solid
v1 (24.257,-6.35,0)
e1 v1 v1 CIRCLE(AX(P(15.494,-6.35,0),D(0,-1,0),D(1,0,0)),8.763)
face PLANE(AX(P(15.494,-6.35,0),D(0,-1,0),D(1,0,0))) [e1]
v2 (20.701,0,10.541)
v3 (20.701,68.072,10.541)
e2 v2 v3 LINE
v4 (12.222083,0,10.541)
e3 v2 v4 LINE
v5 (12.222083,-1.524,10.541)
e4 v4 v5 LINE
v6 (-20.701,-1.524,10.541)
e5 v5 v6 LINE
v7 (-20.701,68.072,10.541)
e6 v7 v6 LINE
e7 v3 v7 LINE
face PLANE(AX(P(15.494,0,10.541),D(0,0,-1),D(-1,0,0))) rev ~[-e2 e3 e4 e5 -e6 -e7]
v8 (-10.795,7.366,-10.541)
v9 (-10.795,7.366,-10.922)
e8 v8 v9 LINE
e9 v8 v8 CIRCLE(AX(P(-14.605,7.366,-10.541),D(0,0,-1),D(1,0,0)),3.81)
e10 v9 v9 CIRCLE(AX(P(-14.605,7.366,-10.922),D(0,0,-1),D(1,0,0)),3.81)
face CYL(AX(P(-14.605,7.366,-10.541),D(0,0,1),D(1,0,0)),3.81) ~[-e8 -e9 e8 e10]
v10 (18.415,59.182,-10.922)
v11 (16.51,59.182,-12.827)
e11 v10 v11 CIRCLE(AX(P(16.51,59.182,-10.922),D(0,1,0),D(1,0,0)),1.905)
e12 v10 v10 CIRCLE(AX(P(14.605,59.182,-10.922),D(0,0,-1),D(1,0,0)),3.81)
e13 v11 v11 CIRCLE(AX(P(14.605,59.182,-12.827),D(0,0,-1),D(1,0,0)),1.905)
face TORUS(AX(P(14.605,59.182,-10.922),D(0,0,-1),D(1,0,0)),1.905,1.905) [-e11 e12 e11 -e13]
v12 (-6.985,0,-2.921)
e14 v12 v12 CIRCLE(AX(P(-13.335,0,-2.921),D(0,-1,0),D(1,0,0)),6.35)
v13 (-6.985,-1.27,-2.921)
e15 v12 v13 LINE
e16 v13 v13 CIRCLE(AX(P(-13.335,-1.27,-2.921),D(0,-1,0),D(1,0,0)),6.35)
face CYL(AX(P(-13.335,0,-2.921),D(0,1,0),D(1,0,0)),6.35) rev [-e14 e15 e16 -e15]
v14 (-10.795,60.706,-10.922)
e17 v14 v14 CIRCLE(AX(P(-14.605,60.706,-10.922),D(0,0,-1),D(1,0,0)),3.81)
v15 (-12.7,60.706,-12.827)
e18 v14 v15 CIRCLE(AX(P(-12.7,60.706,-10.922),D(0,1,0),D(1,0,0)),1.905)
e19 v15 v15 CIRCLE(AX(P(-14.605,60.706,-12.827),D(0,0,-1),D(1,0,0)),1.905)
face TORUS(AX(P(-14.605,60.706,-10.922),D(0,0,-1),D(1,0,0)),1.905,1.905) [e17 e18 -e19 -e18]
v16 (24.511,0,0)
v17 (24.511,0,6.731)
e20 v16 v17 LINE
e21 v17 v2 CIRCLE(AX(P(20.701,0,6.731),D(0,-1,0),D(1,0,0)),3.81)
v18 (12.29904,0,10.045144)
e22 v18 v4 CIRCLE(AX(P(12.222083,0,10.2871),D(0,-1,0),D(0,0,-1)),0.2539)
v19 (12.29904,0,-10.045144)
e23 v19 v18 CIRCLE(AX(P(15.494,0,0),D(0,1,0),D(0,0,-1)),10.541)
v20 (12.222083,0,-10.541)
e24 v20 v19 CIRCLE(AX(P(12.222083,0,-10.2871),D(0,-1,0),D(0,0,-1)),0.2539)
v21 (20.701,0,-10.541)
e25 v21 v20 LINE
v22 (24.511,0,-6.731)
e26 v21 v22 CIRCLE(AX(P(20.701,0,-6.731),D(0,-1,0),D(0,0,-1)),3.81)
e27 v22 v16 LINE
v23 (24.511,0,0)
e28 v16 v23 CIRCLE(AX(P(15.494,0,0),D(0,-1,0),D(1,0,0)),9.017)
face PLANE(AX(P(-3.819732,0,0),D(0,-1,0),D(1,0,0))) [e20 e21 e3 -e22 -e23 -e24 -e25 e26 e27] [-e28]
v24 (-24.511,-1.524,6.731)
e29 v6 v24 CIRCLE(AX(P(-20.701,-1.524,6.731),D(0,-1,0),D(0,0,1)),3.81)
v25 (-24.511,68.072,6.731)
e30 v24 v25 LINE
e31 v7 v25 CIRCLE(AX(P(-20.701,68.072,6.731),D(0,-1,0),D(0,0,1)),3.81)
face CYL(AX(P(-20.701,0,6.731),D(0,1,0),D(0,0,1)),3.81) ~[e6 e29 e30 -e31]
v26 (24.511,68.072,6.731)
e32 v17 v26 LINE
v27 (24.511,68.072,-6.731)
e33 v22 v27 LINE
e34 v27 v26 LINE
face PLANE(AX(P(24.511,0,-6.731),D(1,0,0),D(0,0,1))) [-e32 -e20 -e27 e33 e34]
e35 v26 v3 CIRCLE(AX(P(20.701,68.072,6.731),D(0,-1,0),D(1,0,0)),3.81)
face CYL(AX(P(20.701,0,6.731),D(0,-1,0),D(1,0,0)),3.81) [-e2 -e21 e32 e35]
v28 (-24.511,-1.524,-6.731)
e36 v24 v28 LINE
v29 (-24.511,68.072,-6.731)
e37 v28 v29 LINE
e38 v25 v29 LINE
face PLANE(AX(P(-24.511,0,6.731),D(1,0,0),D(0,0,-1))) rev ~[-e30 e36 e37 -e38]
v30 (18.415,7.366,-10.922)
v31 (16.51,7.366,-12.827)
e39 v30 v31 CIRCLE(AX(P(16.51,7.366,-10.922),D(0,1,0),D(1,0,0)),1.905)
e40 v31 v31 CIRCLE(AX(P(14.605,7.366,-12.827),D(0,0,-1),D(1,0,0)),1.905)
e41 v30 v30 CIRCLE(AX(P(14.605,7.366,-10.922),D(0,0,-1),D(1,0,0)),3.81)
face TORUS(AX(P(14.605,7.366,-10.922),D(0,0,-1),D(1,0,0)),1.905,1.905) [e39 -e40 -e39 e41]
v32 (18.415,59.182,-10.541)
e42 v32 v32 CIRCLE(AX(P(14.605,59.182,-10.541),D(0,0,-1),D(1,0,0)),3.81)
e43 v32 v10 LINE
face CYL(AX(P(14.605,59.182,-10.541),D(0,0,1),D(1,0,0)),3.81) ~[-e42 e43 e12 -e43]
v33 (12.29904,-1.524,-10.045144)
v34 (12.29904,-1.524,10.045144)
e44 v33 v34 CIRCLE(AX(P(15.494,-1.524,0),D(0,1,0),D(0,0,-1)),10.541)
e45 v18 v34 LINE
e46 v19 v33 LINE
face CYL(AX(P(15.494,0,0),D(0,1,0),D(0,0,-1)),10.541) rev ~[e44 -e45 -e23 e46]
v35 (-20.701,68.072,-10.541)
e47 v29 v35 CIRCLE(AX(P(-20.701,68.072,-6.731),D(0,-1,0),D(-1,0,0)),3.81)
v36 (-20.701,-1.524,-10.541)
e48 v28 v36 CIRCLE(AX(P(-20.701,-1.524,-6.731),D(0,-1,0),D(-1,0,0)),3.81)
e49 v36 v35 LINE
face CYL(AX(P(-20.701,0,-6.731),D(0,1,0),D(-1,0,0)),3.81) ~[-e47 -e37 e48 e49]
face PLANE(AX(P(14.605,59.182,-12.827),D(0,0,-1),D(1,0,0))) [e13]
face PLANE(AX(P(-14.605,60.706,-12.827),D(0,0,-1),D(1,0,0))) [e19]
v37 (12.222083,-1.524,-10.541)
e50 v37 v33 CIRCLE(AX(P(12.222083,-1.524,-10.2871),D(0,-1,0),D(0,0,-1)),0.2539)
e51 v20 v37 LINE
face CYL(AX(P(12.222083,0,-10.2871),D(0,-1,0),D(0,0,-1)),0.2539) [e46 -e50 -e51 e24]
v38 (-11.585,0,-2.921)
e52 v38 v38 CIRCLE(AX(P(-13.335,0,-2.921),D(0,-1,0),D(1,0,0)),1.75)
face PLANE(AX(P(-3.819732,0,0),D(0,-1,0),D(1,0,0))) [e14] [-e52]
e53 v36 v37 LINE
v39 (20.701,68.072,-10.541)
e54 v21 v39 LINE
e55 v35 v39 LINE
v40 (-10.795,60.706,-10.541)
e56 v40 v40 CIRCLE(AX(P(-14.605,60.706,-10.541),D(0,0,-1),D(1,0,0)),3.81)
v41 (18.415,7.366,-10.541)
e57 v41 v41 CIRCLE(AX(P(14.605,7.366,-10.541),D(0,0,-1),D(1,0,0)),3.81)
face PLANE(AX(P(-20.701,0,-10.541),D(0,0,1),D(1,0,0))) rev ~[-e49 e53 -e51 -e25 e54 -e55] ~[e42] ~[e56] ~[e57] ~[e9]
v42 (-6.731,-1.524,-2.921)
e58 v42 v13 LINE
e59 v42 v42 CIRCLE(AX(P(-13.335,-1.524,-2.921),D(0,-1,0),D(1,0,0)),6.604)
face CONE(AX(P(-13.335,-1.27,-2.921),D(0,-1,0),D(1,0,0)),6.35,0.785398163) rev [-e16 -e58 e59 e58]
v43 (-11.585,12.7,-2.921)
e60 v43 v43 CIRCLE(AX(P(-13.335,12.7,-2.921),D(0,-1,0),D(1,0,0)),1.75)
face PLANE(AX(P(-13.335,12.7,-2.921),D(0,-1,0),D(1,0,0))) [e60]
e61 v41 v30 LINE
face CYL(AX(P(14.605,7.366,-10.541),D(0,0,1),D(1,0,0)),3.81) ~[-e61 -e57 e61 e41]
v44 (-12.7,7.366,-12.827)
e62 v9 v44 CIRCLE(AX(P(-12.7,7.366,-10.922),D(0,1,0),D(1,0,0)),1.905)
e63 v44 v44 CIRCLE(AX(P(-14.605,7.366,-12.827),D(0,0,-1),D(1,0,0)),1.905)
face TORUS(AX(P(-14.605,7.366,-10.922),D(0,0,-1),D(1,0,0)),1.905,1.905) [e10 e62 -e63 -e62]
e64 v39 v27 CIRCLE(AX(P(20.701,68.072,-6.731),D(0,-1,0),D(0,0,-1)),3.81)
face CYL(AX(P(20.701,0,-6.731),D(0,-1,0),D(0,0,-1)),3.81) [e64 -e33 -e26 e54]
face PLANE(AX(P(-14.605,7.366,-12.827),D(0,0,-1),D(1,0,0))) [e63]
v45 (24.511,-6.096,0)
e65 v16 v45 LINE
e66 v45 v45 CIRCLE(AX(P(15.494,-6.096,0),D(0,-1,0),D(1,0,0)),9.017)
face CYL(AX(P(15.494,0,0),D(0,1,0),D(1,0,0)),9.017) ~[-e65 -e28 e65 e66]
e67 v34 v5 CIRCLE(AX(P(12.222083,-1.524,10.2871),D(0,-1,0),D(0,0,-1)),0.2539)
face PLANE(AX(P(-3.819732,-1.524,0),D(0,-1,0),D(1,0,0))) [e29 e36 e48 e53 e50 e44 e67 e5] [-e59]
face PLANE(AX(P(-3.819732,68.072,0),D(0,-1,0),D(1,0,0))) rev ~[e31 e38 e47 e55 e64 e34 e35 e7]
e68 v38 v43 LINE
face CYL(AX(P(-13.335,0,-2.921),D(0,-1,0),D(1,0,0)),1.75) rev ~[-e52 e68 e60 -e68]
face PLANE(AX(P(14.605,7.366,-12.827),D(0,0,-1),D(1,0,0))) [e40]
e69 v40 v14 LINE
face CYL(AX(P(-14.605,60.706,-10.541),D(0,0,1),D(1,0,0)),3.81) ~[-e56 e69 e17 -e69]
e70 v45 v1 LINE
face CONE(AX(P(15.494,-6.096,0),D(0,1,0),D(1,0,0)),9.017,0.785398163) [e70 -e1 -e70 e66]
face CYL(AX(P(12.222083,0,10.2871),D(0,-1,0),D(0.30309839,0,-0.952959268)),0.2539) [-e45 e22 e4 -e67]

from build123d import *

# Parameters (mm, degrees)
F0_R     = 6.35
F0_R_2   = 9.017
F0_R_3   = 1.75
F1_DEPTH = 68.072
F2_DEPTH = 6.35
F3_DEPTH = 1.524
F4_DEPTH = 12.7
F5_R     = 0.2539
F6_SIZE  = 0.254
F7_R     = 3.81
F8_DEPTH = 2.286
F9_R     = 1.905


# Not quite as in the source:
# - a fillet or chamfer is up to 0.001 mm smaller than in the source, because OpenCascade refuses the exact size


with BuildPart() as f1:
    # F0 (on Front) → F1 (new body)
    with BuildSketch(Plane.XZ):
        with BuildLine():
            Line((-20.701, -10.541), (15.494, -10.541))
            ThreePointArc((15.494, -10.541), (4.953, 0), (15.494, 10.541))
            Line((15.494, 10.541), (-20.701, 10.541))
            ThreePointArc((-20.701, 10.541), (-23.3950768363, 9.4250768363), (-24.511, 6.731))
            Line((-24.511, 6.731), (-24.511, -6.731))
            ThreePointArc((-24.511, -6.731), (-23.3950768363, -9.4250768363), (-20.701, -10.541))
        make_face()
        with Locations((-13.335, -2.921)):
            Circle(F0_R, mode=Mode.SUBTRACT)
        with BuildLine():
            Line((15.494, -10.541), (20.701, -10.541))
            ThreePointArc((20.701, -10.541), (23.3950768363, -9.4250768363), (24.511, -6.731))
            Line((24.511, -6.731), (24.511, 0))
            Line((24.511, 0), (24.511, 6.731))
            ThreePointArc((24.511, 6.731), (23.3950768363, 9.4250768363), (20.701, 10.541))
            Line((20.701, 10.541), (15.494, 10.541))
            ThreePointArc((15.494, 10.541), (4.953, 0), (15.494, -10.541))
        make_face()
        with Locations((15.494, 0)):
            Circle(F0_R_2, mode=Mode.SUBTRACT)
        with Locations((15.494, 0)):
            Circle(F0_R_2)
        with Locations((-13.335, -2.921)):
            Circle(F0_R)
        with Locations((-13.335, -2.921)):
            Circle(F0_R_3, mode=Mode.SUBTRACT)
        with Locations((-13.335, -2.921)):
            Circle(F0_R_3)
    extrude(amount=-F1_DEPTH)

    # F0 (on Front) → F2 (join)
    with BuildSketch(Plane.XZ):
        with Locations((15.494, 0)):
            Circle(F0_R_2)
    extrude(amount=F2_DEPTH)

    # F0 (on Front) → F3 (join)
    with BuildSketch(Plane.XZ):
        with BuildLine():
            Line((-20.701, -10.541), (15.494, -10.541))
            ThreePointArc((15.494, -10.541), (4.953, 0), (15.494, 10.541))
            Line((15.494, 10.541), (-20.701, 10.541))
            ThreePointArc((-20.701, 10.541), (-23.3950768363, 9.4250768363), (-24.511, 6.731))
            Line((-24.511, 6.731), (-24.511, -6.731))
            ThreePointArc((-24.511, -6.731), (-23.3950768363, -9.4250768363), (-20.701, -10.541))
        make_face()
        with Locations((-13.335, -2.921)):
            Circle(F0_R, mode=Mode.SUBTRACT)
    extrude(amount=F3_DEPTH)

    # F0 (on Front) → F4 (cut)
    with BuildSketch(Plane.XZ):
        with Locations((-13.335, -2.921)):
            Circle(F0_R_3)
    extrude(amount=-F4_DEPTH, mode=Mode.SUBTRACT)

    # F5 (radius 0.254 in the source; OpenCascade refuses exactly that, so slightly less here)
    f5_edges = [f1.edges().sort_by_distance(p)[0] for p in [
        (15.494, -0.762, 10.541),
        (15.494, -0.762, -10.541),
    ]]
    fillet(f5_edges, radius=F5_R)

    # F6
    f6_edges = [f1.edges().sort_by_distance(p)[0] for p in [
        (6.477, -6.35, 0),
        (-19.685, -1.524, -2.921),
    ]]
    chamfer(f6_edges, length=F6_SIZE)

    # F7 (on face) → F8 (join)
    with BuildSketch(Plane(origin=(0, 0, -10.541), x_dir=(1, 0, 0), z_dir=(0, 0, -1))):
        with Locations((-14.605, -7.366)):
            Circle(F7_R)
        with Locations((14.605, -7.366)):
            Circle(F7_R)
        with Locations((-14.605, -60.706)):
            Circle(F7_R)
        with Locations((14.605, -59.182)):
            Circle(F7_R)
    extrude(amount=F8_DEPTH)

    # F9
    f9_edges = [f1.edges().sort_by_distance(p)[0] for p in [
        (-18.415, 7.366, -12.827),
        (10.795, 7.366, -12.827),
        (10.795, 59.182, -12.827),
        (-18.415, 60.706, -12.827),
    ]]
    fillet(f9_edges, radius=F9_R)


solid = f1.part
